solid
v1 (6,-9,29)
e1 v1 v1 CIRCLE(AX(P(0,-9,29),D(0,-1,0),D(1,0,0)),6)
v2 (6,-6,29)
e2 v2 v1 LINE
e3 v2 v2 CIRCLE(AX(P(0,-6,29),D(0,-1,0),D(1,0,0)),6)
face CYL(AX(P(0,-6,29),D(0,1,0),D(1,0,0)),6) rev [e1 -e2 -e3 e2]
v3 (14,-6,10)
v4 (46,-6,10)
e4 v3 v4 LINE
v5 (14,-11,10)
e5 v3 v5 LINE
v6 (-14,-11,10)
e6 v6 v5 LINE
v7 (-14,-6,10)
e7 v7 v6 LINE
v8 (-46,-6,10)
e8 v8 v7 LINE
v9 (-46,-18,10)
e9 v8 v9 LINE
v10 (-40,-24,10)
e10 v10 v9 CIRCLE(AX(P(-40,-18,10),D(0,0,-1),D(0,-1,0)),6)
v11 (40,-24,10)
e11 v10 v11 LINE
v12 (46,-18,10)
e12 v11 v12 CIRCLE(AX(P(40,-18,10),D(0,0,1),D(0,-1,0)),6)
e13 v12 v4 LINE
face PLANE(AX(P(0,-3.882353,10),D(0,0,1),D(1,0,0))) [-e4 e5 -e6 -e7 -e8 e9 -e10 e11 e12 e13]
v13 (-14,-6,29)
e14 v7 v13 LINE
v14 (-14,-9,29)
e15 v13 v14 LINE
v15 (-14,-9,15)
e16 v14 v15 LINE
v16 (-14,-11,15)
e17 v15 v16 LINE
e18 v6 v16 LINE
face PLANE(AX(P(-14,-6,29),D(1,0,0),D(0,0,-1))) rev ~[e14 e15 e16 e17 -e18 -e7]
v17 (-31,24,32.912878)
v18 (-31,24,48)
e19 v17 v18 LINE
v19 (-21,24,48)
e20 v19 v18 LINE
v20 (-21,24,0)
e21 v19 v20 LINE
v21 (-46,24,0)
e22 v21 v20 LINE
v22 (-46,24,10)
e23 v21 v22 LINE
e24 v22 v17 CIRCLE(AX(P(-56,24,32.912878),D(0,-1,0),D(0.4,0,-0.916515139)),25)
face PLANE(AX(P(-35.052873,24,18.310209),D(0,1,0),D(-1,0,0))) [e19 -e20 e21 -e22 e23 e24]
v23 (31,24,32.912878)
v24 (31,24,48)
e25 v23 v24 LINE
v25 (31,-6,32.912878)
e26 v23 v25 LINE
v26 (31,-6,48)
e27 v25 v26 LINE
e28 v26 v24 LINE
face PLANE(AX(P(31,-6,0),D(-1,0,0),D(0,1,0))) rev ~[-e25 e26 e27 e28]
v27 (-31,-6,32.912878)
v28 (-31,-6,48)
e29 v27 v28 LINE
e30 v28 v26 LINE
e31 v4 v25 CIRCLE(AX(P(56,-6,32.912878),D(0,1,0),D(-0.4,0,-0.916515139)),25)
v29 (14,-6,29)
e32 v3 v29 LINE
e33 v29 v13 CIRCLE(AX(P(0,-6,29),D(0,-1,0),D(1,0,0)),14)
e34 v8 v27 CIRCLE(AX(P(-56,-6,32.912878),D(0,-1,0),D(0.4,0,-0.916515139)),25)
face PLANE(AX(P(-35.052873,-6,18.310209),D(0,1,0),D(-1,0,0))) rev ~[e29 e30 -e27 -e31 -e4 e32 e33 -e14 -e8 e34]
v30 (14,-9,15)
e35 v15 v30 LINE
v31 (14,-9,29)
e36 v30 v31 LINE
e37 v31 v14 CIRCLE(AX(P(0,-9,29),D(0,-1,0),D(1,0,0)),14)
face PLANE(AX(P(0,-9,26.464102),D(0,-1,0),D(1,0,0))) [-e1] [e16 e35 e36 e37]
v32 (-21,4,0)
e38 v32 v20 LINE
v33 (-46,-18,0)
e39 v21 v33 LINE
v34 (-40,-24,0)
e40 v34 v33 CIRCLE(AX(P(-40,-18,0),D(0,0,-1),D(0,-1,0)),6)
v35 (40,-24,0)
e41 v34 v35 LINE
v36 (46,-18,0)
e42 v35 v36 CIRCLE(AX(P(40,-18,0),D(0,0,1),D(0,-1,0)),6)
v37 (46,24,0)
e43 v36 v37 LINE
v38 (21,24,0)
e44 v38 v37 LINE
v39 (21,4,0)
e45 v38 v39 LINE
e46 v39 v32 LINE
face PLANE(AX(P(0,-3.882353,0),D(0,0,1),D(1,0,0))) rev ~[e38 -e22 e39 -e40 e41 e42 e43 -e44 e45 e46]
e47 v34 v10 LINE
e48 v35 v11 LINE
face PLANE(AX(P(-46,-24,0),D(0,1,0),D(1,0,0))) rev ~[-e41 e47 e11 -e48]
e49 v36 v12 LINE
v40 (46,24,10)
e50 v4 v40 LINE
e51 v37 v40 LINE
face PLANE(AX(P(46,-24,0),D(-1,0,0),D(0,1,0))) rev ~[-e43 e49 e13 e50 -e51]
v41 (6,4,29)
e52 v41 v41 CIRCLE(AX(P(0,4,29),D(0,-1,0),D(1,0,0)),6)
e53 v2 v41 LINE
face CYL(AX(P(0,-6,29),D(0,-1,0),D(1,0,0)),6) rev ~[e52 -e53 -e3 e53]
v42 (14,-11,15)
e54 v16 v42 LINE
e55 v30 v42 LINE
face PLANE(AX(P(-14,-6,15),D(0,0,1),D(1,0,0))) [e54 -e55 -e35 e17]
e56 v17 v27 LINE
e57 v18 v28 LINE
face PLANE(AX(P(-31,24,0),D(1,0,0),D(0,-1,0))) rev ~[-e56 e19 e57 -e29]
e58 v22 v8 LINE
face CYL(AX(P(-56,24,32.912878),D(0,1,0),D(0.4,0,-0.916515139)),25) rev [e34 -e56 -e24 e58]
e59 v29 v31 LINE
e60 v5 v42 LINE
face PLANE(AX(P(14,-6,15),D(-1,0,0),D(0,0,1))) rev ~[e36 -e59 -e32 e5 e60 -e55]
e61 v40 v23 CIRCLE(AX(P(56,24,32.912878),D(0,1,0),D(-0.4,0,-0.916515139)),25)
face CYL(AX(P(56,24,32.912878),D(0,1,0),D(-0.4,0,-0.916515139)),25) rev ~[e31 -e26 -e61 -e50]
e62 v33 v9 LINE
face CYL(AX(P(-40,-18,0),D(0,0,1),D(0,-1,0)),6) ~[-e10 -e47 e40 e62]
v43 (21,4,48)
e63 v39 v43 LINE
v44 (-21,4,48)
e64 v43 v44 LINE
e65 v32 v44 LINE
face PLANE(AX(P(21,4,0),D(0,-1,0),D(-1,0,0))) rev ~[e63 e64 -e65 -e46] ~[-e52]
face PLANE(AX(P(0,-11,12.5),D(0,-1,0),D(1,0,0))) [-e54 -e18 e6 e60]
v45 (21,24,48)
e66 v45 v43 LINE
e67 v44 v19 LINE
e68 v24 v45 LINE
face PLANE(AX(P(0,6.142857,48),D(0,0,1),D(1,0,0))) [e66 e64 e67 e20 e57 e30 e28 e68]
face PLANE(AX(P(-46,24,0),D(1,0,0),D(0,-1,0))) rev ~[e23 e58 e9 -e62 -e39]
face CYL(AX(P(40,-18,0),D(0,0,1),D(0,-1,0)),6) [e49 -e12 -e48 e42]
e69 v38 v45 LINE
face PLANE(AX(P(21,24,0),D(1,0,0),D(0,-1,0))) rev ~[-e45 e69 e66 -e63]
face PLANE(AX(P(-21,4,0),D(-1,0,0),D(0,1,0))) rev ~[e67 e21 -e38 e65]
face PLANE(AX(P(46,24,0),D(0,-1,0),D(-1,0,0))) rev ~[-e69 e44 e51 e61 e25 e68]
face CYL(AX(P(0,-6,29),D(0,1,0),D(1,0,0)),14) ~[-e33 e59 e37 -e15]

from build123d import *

# Parameters (mm, degrees)
F1_DEPTH    = 48
F2_DEPTH    = 10
F3_R        = 6
F4_T1_DEPTH = 30
F5_W        = 28
F5_H        = 5
F6_DEPTH    = 5
F5_R        = 6
F7_DEPTH    = 3
F8_DEPTH    = 30.001


# Not quite as in the source:
# - a fillet or chamfer that OpenCascade refuses, or shapes differently, is made with other operations: its cross-section is extruded or revolved along the edge and cut away or added


with BuildPart() as f1:
    # F0 (on Top) → F1 (new body)
    with BuildSketch(Plane.XY):
        Polygon((31, -6), (31, 24), (21, 24), (21, 4), (-21, 4), (-21, 24), (-31, 24), (-31, -6), align=None)
    extrude(amount=F1_DEPTH)

    # F0 (on Top) → F2 (join)
    with BuildSketch(Plane.XY):
        Polygon((-46, -24), (46, -24), (46, 24), (31, 24), (31, -6), (-31, -6), (-31, 24), (-46, 24), align=None)
        Polygon((31, -6), (31, 24), (21, 24), (21, 4), (-21, 4), (-21, 24), (-31, 24), (-31, -6), align=None)
    extrude(amount=F2_DEPTH)

    # F3
    f3_edges = [f1.edges().sort_by_distance(p)[0] for p in [
        (-46, -24, 5),
        (46, -24, 5),
    ]]
    fillet(f3_edges, radius=F3_R)

    # F4: fillet of radius 25 on 2 edges, made by hand

    # F4_s2 → F4_t1 (join)
    with BuildSketch(Plane.XZ.offset(-24)):
        with BuildLine():
            ThreePointArc((-46, 10), (-35.0834993366, 19.2198145372), (-31, 32.9128784748))
            Line((-31, 32.9128784748), (-31, 10))
            Line((-31, 10), (-46, 10))
        make_face()
        with BuildLine():
            ThreePointArc((46, 10), (35.0834993366, 19.2198145372), (31, 32.9128784748))
            Line((31, 32.9128784748), (31, 10))
            Line((31, 10), (46, 10))
        make_face()
    extrude(amount=F4_T1_DEPTH)

    # F5 (on face) → F6 (join)
    with BuildSketch(Plane.XZ.offset(6)):
        with Locations((0, 12.5)):
            Rectangle(F5_W, F5_H)
    extrude(amount=F6_DEPTH)

    # F5 (on face) → F7 (join)
    with BuildSketch(Plane.XZ.offset(6)):
        with BuildLine():
            Line((14, 15), (14, 29))
            ThreePointArc((14, 29), (0, 43), (-14, 29))
            Line((-14, 29), (-14, 15))
            Line((-14, 15), (14, 15))
        make_face()
        with Locations((0, 29)):
            Circle(F5_R, mode=Mode.SUBTRACT)
    extrude(amount=F7_DEPTH)

    # F8 (cut, through all): a face of the model
    f8_faces = [f1.faces().sort_by_distance(p)[0] for p in [
        (0, -6, 29),
    ]]
    extrude(f8_faces, amount=-F8_DEPTH, mode=Mode.SUBTRACT)


solid = f1.part
